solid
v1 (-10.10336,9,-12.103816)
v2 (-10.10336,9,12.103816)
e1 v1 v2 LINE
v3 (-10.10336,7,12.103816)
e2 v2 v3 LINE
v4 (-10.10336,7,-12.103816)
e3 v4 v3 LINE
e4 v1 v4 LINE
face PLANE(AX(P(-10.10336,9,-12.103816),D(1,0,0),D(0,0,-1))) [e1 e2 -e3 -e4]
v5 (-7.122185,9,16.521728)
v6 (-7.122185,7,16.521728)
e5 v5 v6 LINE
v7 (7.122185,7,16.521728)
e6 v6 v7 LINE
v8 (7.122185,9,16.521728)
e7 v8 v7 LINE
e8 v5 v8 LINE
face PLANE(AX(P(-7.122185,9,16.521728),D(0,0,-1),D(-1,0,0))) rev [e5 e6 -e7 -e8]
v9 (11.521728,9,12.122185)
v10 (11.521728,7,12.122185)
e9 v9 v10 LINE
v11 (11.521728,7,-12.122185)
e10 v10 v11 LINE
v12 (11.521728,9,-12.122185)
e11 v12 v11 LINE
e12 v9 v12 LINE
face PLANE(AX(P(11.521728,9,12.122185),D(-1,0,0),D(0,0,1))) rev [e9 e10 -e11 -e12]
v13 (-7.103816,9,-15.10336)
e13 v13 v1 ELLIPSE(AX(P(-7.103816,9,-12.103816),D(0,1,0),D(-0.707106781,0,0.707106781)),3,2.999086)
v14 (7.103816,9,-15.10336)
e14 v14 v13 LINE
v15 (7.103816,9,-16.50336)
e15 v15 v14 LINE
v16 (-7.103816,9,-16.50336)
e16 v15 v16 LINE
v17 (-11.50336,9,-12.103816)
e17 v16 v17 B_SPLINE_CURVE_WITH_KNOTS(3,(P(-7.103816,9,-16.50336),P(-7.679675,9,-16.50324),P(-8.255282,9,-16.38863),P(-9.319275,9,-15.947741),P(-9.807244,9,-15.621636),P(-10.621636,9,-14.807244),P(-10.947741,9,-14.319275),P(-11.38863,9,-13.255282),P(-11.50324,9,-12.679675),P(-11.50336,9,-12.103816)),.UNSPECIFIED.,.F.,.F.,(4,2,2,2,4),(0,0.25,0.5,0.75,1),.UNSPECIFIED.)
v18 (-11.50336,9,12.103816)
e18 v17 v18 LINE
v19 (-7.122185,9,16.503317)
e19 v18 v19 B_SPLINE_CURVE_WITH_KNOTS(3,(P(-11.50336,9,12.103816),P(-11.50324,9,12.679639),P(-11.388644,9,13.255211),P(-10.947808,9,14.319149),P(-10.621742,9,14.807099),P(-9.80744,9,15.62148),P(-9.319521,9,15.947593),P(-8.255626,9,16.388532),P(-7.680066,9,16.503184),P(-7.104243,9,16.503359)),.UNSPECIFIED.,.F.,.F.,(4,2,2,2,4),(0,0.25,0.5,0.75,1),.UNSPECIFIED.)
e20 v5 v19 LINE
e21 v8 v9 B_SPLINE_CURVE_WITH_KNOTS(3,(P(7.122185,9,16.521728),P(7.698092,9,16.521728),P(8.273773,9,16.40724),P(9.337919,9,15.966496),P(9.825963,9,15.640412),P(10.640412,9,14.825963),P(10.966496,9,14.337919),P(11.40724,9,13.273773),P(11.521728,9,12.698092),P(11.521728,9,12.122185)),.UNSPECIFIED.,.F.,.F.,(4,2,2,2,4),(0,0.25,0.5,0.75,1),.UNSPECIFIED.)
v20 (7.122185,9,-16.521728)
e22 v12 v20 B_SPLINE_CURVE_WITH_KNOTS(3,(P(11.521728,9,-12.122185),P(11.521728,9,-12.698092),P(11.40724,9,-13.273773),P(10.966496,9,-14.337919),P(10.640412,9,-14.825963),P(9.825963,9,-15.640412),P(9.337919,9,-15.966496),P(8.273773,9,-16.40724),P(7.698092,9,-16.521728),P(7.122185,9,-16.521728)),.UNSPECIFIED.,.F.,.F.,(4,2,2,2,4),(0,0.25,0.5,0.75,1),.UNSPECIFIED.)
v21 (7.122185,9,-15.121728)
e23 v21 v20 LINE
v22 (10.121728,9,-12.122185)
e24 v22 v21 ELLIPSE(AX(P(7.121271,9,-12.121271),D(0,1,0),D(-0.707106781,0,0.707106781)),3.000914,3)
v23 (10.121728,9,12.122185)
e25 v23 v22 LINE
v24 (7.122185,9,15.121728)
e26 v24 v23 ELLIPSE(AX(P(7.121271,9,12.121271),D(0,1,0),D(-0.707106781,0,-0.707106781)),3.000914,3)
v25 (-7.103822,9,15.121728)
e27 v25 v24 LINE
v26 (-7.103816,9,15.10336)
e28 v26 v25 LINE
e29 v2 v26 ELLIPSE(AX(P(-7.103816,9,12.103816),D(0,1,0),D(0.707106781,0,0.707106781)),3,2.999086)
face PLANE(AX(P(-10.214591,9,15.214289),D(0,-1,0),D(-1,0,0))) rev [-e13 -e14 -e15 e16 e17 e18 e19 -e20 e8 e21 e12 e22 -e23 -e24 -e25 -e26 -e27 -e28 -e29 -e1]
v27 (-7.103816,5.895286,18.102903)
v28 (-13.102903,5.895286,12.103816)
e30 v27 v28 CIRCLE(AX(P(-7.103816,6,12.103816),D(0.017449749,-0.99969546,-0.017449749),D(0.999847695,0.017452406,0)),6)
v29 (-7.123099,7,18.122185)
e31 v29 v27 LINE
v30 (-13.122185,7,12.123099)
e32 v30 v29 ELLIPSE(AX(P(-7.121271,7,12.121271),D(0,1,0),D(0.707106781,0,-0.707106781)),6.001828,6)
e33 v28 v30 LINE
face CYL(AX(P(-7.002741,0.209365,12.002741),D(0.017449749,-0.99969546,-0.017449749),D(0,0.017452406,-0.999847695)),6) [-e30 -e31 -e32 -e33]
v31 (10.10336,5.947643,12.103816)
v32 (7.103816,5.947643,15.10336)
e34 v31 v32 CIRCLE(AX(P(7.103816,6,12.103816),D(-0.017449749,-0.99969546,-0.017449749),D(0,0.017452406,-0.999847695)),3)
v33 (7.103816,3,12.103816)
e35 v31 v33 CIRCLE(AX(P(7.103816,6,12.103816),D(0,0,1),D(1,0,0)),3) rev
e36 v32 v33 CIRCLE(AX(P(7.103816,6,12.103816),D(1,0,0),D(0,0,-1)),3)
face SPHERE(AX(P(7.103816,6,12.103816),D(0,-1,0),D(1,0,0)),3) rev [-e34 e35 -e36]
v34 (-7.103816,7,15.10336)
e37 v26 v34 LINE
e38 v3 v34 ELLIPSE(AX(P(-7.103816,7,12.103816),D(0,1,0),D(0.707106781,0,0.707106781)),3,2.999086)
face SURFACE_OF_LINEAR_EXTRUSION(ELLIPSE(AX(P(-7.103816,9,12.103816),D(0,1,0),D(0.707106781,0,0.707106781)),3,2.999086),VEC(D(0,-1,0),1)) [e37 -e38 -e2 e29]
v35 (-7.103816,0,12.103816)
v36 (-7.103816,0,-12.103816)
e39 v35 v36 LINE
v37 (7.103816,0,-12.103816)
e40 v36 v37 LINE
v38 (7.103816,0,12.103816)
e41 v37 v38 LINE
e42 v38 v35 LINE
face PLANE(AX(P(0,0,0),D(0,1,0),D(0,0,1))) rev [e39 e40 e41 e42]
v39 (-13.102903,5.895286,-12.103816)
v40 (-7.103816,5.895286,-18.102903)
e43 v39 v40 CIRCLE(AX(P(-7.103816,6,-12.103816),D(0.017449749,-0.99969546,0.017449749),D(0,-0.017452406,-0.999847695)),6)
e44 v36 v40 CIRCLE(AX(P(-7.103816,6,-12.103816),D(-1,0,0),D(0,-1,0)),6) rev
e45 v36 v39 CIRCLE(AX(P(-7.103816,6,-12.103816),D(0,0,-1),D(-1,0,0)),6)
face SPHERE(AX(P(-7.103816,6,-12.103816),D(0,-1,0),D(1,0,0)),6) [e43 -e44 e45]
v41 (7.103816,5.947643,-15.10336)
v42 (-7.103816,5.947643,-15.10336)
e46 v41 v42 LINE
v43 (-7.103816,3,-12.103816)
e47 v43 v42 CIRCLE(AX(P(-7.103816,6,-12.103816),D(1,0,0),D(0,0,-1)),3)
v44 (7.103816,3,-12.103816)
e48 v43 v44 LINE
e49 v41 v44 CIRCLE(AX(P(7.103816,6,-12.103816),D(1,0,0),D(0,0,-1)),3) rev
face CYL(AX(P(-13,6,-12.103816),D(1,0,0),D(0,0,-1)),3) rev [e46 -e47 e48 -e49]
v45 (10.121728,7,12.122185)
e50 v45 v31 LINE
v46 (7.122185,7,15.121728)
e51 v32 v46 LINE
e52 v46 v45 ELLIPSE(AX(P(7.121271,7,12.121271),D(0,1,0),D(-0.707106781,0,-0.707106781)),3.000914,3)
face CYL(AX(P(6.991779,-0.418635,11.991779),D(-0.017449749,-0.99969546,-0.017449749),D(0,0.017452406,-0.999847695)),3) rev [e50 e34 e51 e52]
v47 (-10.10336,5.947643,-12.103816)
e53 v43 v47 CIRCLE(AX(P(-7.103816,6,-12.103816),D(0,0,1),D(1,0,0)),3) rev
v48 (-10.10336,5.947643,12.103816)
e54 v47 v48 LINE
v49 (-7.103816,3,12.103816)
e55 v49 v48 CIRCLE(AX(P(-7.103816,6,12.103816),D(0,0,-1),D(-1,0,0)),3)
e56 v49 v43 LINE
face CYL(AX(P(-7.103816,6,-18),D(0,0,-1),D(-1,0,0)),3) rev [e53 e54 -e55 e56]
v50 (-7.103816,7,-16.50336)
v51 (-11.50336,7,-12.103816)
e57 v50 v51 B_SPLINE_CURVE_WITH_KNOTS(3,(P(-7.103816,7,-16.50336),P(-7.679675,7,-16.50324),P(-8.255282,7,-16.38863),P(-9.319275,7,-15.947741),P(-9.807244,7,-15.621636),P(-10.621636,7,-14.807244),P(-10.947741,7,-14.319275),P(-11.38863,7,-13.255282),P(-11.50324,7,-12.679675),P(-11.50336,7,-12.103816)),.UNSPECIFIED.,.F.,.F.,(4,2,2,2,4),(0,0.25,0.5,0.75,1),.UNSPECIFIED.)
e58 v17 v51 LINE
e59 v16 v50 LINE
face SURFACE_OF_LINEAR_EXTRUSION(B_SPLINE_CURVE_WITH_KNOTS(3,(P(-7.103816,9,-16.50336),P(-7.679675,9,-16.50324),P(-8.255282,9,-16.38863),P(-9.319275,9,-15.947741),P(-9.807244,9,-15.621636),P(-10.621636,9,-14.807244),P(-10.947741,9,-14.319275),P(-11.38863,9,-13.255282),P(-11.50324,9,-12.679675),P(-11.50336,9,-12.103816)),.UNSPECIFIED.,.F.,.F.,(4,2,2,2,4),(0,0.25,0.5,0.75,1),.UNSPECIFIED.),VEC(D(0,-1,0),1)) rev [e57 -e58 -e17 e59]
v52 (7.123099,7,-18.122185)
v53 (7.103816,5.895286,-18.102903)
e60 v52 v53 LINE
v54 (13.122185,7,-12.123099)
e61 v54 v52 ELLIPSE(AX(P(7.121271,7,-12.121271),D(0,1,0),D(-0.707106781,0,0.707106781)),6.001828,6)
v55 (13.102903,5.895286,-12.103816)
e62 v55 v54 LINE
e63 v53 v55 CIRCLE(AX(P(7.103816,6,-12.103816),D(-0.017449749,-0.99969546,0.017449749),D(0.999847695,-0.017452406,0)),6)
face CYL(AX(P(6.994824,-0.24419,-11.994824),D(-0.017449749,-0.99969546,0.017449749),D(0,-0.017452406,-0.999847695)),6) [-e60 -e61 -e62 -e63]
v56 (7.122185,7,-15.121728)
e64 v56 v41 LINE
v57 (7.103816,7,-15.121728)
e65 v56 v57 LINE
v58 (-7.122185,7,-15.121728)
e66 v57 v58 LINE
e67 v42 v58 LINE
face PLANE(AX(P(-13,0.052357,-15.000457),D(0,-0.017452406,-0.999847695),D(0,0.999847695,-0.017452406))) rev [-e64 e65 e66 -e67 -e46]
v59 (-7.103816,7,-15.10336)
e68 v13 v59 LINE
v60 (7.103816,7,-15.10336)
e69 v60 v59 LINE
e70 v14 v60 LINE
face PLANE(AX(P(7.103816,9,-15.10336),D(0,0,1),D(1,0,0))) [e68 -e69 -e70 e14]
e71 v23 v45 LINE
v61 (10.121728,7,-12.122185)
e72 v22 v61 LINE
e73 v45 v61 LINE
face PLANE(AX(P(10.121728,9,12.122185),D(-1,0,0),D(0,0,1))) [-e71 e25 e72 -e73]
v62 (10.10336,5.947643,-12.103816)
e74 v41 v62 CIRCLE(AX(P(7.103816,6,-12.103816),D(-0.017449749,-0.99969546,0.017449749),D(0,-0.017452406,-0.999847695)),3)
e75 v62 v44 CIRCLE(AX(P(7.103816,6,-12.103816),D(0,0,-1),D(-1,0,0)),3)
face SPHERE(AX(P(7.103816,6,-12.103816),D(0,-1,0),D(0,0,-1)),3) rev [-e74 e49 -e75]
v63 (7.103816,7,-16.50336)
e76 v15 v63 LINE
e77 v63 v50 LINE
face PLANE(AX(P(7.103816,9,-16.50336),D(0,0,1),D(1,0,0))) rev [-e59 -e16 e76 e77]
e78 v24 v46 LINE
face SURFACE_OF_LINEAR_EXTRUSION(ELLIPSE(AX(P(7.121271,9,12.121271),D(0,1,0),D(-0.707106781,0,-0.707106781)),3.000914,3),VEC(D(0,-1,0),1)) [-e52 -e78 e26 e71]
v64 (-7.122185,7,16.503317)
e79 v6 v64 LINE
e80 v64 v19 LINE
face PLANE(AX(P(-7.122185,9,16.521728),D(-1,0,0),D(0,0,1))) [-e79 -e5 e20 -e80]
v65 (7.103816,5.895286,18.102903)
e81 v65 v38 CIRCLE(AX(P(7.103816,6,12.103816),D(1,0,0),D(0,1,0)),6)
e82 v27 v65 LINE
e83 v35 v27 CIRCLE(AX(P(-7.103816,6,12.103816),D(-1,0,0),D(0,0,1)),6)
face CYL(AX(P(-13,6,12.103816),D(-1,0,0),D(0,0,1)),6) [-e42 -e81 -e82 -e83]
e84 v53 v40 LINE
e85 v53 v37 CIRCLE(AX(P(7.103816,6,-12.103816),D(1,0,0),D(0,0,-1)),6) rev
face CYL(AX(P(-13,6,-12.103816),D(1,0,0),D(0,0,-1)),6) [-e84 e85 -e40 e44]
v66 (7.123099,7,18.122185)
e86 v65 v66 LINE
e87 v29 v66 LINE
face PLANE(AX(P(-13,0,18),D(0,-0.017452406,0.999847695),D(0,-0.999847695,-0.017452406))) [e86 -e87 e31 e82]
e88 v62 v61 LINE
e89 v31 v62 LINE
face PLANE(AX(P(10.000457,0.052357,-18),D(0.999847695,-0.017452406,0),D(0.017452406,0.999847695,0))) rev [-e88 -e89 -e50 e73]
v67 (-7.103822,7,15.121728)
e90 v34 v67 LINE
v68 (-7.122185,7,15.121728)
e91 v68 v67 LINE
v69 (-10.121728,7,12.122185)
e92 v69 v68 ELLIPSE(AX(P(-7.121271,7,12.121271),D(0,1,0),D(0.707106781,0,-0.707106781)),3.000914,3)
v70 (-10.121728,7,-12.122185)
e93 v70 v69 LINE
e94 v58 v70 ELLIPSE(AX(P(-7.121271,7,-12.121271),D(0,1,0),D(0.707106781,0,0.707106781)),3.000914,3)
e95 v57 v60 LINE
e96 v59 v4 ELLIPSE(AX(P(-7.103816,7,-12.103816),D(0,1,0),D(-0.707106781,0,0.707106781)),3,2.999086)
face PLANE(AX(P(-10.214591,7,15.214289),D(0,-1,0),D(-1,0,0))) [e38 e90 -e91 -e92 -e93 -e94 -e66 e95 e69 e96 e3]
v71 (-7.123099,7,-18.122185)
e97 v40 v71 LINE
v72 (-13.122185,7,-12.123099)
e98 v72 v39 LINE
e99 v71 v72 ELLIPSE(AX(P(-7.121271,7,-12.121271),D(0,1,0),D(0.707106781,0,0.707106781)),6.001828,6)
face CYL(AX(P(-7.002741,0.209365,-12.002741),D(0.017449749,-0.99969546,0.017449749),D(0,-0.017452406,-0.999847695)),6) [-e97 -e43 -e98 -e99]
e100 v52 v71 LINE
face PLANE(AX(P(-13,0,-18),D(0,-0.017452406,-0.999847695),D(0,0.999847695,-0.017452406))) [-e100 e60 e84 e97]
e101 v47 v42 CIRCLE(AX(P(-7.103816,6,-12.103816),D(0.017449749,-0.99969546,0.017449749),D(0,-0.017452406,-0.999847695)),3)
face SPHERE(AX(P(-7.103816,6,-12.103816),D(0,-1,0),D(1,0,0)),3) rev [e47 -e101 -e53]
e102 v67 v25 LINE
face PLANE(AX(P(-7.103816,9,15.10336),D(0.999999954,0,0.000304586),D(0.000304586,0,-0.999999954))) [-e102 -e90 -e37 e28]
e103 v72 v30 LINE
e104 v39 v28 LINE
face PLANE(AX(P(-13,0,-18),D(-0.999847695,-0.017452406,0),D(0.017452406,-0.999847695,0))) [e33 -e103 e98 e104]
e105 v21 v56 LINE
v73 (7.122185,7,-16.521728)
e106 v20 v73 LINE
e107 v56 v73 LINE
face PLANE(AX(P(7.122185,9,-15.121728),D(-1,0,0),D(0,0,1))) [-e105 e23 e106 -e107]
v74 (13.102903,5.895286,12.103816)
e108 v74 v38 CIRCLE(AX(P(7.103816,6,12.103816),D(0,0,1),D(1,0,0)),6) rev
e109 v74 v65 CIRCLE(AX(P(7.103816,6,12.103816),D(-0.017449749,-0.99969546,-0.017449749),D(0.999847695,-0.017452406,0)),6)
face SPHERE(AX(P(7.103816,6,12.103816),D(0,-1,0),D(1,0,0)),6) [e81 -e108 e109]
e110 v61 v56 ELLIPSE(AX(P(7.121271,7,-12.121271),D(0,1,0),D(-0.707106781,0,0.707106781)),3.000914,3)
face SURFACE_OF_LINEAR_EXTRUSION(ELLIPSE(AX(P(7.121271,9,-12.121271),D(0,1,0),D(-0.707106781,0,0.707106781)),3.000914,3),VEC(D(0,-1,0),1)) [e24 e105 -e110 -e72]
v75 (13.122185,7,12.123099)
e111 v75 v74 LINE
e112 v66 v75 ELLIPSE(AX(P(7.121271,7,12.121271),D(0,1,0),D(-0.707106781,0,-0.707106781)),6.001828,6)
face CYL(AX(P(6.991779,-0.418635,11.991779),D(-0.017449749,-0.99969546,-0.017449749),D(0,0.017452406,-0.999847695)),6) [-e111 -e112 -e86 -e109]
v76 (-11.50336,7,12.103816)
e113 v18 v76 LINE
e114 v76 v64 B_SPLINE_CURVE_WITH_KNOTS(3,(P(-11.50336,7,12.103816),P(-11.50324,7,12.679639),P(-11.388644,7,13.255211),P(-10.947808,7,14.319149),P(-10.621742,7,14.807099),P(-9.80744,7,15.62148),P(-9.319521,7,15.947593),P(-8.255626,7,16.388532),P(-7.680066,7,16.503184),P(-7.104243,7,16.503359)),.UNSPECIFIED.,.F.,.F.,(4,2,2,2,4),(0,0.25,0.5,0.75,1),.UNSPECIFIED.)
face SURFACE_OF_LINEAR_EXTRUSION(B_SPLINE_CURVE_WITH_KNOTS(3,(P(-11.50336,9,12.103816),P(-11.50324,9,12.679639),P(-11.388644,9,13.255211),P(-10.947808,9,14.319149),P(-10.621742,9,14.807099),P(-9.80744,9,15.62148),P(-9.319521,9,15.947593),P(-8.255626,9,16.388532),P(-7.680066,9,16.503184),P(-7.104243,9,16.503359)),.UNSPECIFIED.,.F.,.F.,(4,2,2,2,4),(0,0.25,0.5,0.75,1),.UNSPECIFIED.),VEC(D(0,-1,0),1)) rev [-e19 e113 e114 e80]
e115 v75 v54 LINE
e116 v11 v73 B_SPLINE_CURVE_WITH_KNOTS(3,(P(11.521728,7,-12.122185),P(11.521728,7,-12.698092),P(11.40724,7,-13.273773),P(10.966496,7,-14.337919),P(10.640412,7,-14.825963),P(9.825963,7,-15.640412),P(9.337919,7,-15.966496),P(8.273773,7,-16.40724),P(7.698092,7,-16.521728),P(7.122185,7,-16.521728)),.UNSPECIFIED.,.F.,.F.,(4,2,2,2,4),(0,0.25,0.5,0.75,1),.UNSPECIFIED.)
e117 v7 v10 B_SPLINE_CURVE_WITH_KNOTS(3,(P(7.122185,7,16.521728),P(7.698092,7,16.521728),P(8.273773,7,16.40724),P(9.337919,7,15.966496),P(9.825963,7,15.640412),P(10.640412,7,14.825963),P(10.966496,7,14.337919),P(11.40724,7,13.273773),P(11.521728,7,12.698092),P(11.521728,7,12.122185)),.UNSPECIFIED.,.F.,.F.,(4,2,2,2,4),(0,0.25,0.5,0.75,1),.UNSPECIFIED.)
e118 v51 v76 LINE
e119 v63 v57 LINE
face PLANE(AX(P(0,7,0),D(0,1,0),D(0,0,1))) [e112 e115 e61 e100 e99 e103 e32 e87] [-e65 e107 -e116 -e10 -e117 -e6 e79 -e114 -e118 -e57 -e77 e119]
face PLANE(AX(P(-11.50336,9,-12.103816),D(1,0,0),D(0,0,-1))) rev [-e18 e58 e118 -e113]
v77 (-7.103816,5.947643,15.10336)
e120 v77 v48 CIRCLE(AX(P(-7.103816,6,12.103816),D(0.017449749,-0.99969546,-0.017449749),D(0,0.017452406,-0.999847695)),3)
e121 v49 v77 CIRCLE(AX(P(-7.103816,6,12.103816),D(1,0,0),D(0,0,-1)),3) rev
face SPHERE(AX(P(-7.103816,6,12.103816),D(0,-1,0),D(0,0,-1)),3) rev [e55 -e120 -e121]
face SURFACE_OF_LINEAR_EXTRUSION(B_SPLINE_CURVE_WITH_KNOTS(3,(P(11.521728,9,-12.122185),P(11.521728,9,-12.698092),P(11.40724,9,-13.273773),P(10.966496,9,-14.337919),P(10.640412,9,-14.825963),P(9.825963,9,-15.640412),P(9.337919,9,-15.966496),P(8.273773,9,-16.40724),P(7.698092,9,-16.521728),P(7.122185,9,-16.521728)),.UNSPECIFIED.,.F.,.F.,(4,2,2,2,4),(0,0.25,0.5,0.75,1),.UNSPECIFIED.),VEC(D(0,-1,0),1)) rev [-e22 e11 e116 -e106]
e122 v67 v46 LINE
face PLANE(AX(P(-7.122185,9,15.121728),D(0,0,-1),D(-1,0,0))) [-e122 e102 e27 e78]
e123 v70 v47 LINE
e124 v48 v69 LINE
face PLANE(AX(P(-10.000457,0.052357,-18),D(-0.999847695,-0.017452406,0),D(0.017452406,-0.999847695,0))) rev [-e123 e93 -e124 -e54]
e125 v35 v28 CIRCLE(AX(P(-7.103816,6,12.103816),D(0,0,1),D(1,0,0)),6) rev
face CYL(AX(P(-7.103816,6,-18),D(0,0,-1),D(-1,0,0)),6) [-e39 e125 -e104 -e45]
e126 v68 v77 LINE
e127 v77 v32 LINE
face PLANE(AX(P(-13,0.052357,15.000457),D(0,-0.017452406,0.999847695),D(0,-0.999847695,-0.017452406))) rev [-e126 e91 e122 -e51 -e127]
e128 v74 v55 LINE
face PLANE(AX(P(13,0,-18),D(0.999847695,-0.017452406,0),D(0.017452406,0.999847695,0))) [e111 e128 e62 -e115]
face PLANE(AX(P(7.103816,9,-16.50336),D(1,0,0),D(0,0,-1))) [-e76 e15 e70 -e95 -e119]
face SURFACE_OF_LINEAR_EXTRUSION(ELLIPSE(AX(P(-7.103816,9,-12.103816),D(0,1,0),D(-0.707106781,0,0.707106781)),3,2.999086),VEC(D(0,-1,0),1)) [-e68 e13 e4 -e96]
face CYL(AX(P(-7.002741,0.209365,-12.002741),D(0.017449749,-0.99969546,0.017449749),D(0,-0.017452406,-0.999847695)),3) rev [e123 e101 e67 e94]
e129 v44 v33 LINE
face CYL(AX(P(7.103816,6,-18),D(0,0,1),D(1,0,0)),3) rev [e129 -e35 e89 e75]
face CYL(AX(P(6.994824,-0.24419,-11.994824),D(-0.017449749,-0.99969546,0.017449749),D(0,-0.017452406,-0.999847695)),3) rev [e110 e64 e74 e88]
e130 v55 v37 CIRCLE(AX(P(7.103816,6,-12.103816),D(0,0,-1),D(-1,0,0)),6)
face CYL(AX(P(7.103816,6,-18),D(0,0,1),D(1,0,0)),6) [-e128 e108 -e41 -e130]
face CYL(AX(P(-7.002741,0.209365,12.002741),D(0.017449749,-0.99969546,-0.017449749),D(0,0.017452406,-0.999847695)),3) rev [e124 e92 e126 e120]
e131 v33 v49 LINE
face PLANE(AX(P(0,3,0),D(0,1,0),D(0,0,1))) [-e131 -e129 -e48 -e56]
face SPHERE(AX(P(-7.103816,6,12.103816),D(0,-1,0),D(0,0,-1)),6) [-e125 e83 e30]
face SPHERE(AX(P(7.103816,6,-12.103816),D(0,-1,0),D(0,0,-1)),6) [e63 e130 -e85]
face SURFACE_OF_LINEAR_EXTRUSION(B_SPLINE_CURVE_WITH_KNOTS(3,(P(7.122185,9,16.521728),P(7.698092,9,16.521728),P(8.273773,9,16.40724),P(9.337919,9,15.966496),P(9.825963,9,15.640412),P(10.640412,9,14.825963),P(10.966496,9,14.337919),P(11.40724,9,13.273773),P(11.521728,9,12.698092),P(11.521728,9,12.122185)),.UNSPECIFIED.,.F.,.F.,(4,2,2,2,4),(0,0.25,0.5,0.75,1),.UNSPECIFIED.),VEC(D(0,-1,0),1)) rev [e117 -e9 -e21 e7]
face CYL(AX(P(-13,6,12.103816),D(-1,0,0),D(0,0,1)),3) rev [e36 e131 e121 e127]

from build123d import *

# Parameters (mm, degrees)
SKETCH1_W           = 26
SKETCH1_H           = 36
BOSS_EXTRUDE1_DEPTH = 7
BOSS_EXTRUDE1_DRAFT = -1
FILLET1_R           = 6
SHELL1_T            = -3
EXTRUDE_THIN1_DEPTH = 2


# Read off the part's stored shape, not the designer's step: Extrude-Thin1
with BuildPart() as part:
    # Sketch1 → Boss-Extrude1 (with draft: the straight prism first)
    with BuildSketch(Plane(origin=(0, 0, 0), x_dir=(1, 0, 0), z_dir=(0, 1, 0))):
        Rectangle(SKETCH1_W, SKETCH1_H)
    extrude(amount=BOSS_EXTRUDE1_DEPTH)
    # Boss-Extrude1: the draft: its side faces are tilted about the plane it starts from
    boss_extrude1_sides = [part.faces().sort_by_distance(p)[0] for p in [
        (-13, 3.5, 0),
        (0, 3.5, 18),
        (13, 3.5, 0),
        (0, 3.5, -18),
    ]]
    draft(boss_extrude1_sides, Plane(origin=(0, 0, 0), x_dir=(1, 0, 0), z_dir=(0, 1, 0)), BOSS_EXTRUDE1_DRAFT)

    # Fillet1
    fillet1_edges = [part.edges().sort_by_distance(p)[0] for p in [
        (0, 0, 18),
        (-13, 0, 0),
        (0, 0, -18),
        (13, 0, 0),
        (13.061092727, 3.5, 18.061092727),
        (-13.061092727, 3.5, 18.061092727),
        (-13.061092727, 3.5, -18.061092727),
        (13.061092727, 3.5, -18.061092727),
    ]]
    fillet(fillet1_edges, radius=FILLET1_R)

    # Shell1
    shell1_openings = [part.faces().sort_by_distance(p)[0] for p in [
        (0, 7, 0),
    ]]
    offset(amount=SHELL1_T, openings=shell1_openings, kind=Kind.INTERSECTION)

    # Extrude-Thin1 outline → Extrude-Thin1 (add)
    with BuildSketch(Plane(origin=(0, 7, 0), x_dir=(1, 0, 0), z_dir=(0, 1, 0))):
        with BuildLine():
            Line((-11.503359551, 12.103816421), (-11.503359551, -12.103816421))
            add(Edge.make_bspline(
                [(-11.503359551, -12.103816421), (-11.503239974, -12.679639127), (-11.388644012, -13.255211042), (-10.94780799, -14.319148914), (-10.621742234, -14.807098768), (-9.807439748, -15.62148016), (-9.319521491, -15.947593193), (-8.261151516, -16.386242364), (-7.692017173, -16.500790934), (-7.122185385, -16.503316936)],
                knots=[0, 0, 0, 0, 0.25, 0.25, 0.5, 0.5, 0.75, 0.75, 0.997403327, 0.997403327, 0.997403327, 0.997403327], degree=3))
            Line((-7.122185385, -16.503316936), (-7.122185385, -16.52172847))
            Line((-7.122185385, -16.52172847), (7.122185385, -16.52172847))
            add(Edge.make_bspline(
                [(7.122185385, -16.52172847), (7.698092154, -16.52172847), (8.273773075, -16.407240069), (9.337918721, -15.966495827), (9.825962781, -15.640412314), (10.640412314, -14.825962781), (10.966495827, -14.337918721), (11.407240069, -13.273773075), (11.52172847, -12.698092154), (11.52172847, -12.122185385)],
                knots=[0, 0, 0, 0, 0.25, 0.25, 0.5, 0.5, 0.75, 0.75, 1, 1, 1, 1], degree=3))
            Line((11.52172847, -12.122185385), (11.52172847, 12.122185385))
            add(Edge.make_bspline(
                [(11.52172847, 12.122185385), (11.52172847, 12.698092154), (11.407240069, 13.273773075), (10.966495827, 14.337918721), (10.640412314, 14.825962781), (9.825962781, 15.640412314), (9.337918721, 15.966495827), (8.273773075, 16.407240069), (7.698092154, 16.52172847), (7.122185385, 16.52172847)],
                knots=[0, 0, 0, 0, 0.25, 0.25, 0.5, 0.5, 0.75, 0.75, 1, 1, 1, 1], degree=3))
            Line((7.122185385, 16.52172847), (7.122185385, 15.12172847))
            add(Edge.make_bspline(
                [(10.12172847, 12.122185385), (10.12172847, 15.12172847), (7.122185385, 15.12172847)],
                knots=[2.356346783, 2.356346783, 2.356346783, 3.926838524, 3.926838524, 3.926838524], degree=2, weights=[1, 0.707214461, 1]))
            Line((10.12172847, 12.122185385), (10.12172847, -12.122185385))
            add(Edge.make_bspline(
                [(7.122185385, -15.12172847), (10.12172847, -15.12172847), (10.12172847, -12.122185385)],
                knots=[2.356346783, 2.356346783, 2.356346783, 3.926838524, 3.926838524, 3.926838524], degree=2, weights=[1, 0.707214461, 1]))
            Line((7.122185385, -15.12172847), (-7.103822016, -15.12172847))
            Line((-7.103822016, -15.12172847), (-7.103816421, -15.103359507))
            add(Edge.make_bspline(
                [(-10.103359507, -12.103816421), (-10.102446165, -15.102446165), (-7.103816421, -15.103359507)],
                knots=[3.92714311, 3.92714311, 3.92714311, 5.497634851, 5.497634851, 5.497634851], degree=2, weights=[1, 0.707214461, 1]))
            Line((-10.103359507, -12.103816421), (-10.103359507, 12.103816421))
            add(Edge.make_bspline(
                [(-7.103816421, 15.103359507), (-10.102446165, 15.102446165), (-10.103359507, 12.103816421)],
                knots=[3.92714311, 3.92714311, 3.92714311, 5.497634851, 5.497634851, 5.497634851], degree=2, weights=[1, 0.707214461, 1]))
            Line((-7.103816421, 15.103359507), (7.103816421, 15.103359507))
            Line((7.103816421, 15.103359507), (7.103816421, 16.503359507))
            Line((7.103816421, 16.503359507), (-7.103816421, 16.503359551))
            add(Edge.make_bspline(
                [(-7.103816421, 16.503359551), (-7.679674662, 16.503239967), (-8.255282039, 16.388629695), (-9.319274889, 15.947740691), (-9.807244134, 15.621636328), (-10.621636328, 14.807244134), (-10.947740691, 14.319274889), (-11.388629695, 13.255282039), (-11.503239967, 12.679674662), (-11.503359551, 12.103816421)],
                knots=[0, 0, 0, 0, 0.25, 0.25, 0.5, 0.5, 0.75, 0.75, 1, 1, 1, 1], degree=3))
        make_face()
    extrude(amount=EXTRUDE_THIN1_DEPTH)


solid = part.part
